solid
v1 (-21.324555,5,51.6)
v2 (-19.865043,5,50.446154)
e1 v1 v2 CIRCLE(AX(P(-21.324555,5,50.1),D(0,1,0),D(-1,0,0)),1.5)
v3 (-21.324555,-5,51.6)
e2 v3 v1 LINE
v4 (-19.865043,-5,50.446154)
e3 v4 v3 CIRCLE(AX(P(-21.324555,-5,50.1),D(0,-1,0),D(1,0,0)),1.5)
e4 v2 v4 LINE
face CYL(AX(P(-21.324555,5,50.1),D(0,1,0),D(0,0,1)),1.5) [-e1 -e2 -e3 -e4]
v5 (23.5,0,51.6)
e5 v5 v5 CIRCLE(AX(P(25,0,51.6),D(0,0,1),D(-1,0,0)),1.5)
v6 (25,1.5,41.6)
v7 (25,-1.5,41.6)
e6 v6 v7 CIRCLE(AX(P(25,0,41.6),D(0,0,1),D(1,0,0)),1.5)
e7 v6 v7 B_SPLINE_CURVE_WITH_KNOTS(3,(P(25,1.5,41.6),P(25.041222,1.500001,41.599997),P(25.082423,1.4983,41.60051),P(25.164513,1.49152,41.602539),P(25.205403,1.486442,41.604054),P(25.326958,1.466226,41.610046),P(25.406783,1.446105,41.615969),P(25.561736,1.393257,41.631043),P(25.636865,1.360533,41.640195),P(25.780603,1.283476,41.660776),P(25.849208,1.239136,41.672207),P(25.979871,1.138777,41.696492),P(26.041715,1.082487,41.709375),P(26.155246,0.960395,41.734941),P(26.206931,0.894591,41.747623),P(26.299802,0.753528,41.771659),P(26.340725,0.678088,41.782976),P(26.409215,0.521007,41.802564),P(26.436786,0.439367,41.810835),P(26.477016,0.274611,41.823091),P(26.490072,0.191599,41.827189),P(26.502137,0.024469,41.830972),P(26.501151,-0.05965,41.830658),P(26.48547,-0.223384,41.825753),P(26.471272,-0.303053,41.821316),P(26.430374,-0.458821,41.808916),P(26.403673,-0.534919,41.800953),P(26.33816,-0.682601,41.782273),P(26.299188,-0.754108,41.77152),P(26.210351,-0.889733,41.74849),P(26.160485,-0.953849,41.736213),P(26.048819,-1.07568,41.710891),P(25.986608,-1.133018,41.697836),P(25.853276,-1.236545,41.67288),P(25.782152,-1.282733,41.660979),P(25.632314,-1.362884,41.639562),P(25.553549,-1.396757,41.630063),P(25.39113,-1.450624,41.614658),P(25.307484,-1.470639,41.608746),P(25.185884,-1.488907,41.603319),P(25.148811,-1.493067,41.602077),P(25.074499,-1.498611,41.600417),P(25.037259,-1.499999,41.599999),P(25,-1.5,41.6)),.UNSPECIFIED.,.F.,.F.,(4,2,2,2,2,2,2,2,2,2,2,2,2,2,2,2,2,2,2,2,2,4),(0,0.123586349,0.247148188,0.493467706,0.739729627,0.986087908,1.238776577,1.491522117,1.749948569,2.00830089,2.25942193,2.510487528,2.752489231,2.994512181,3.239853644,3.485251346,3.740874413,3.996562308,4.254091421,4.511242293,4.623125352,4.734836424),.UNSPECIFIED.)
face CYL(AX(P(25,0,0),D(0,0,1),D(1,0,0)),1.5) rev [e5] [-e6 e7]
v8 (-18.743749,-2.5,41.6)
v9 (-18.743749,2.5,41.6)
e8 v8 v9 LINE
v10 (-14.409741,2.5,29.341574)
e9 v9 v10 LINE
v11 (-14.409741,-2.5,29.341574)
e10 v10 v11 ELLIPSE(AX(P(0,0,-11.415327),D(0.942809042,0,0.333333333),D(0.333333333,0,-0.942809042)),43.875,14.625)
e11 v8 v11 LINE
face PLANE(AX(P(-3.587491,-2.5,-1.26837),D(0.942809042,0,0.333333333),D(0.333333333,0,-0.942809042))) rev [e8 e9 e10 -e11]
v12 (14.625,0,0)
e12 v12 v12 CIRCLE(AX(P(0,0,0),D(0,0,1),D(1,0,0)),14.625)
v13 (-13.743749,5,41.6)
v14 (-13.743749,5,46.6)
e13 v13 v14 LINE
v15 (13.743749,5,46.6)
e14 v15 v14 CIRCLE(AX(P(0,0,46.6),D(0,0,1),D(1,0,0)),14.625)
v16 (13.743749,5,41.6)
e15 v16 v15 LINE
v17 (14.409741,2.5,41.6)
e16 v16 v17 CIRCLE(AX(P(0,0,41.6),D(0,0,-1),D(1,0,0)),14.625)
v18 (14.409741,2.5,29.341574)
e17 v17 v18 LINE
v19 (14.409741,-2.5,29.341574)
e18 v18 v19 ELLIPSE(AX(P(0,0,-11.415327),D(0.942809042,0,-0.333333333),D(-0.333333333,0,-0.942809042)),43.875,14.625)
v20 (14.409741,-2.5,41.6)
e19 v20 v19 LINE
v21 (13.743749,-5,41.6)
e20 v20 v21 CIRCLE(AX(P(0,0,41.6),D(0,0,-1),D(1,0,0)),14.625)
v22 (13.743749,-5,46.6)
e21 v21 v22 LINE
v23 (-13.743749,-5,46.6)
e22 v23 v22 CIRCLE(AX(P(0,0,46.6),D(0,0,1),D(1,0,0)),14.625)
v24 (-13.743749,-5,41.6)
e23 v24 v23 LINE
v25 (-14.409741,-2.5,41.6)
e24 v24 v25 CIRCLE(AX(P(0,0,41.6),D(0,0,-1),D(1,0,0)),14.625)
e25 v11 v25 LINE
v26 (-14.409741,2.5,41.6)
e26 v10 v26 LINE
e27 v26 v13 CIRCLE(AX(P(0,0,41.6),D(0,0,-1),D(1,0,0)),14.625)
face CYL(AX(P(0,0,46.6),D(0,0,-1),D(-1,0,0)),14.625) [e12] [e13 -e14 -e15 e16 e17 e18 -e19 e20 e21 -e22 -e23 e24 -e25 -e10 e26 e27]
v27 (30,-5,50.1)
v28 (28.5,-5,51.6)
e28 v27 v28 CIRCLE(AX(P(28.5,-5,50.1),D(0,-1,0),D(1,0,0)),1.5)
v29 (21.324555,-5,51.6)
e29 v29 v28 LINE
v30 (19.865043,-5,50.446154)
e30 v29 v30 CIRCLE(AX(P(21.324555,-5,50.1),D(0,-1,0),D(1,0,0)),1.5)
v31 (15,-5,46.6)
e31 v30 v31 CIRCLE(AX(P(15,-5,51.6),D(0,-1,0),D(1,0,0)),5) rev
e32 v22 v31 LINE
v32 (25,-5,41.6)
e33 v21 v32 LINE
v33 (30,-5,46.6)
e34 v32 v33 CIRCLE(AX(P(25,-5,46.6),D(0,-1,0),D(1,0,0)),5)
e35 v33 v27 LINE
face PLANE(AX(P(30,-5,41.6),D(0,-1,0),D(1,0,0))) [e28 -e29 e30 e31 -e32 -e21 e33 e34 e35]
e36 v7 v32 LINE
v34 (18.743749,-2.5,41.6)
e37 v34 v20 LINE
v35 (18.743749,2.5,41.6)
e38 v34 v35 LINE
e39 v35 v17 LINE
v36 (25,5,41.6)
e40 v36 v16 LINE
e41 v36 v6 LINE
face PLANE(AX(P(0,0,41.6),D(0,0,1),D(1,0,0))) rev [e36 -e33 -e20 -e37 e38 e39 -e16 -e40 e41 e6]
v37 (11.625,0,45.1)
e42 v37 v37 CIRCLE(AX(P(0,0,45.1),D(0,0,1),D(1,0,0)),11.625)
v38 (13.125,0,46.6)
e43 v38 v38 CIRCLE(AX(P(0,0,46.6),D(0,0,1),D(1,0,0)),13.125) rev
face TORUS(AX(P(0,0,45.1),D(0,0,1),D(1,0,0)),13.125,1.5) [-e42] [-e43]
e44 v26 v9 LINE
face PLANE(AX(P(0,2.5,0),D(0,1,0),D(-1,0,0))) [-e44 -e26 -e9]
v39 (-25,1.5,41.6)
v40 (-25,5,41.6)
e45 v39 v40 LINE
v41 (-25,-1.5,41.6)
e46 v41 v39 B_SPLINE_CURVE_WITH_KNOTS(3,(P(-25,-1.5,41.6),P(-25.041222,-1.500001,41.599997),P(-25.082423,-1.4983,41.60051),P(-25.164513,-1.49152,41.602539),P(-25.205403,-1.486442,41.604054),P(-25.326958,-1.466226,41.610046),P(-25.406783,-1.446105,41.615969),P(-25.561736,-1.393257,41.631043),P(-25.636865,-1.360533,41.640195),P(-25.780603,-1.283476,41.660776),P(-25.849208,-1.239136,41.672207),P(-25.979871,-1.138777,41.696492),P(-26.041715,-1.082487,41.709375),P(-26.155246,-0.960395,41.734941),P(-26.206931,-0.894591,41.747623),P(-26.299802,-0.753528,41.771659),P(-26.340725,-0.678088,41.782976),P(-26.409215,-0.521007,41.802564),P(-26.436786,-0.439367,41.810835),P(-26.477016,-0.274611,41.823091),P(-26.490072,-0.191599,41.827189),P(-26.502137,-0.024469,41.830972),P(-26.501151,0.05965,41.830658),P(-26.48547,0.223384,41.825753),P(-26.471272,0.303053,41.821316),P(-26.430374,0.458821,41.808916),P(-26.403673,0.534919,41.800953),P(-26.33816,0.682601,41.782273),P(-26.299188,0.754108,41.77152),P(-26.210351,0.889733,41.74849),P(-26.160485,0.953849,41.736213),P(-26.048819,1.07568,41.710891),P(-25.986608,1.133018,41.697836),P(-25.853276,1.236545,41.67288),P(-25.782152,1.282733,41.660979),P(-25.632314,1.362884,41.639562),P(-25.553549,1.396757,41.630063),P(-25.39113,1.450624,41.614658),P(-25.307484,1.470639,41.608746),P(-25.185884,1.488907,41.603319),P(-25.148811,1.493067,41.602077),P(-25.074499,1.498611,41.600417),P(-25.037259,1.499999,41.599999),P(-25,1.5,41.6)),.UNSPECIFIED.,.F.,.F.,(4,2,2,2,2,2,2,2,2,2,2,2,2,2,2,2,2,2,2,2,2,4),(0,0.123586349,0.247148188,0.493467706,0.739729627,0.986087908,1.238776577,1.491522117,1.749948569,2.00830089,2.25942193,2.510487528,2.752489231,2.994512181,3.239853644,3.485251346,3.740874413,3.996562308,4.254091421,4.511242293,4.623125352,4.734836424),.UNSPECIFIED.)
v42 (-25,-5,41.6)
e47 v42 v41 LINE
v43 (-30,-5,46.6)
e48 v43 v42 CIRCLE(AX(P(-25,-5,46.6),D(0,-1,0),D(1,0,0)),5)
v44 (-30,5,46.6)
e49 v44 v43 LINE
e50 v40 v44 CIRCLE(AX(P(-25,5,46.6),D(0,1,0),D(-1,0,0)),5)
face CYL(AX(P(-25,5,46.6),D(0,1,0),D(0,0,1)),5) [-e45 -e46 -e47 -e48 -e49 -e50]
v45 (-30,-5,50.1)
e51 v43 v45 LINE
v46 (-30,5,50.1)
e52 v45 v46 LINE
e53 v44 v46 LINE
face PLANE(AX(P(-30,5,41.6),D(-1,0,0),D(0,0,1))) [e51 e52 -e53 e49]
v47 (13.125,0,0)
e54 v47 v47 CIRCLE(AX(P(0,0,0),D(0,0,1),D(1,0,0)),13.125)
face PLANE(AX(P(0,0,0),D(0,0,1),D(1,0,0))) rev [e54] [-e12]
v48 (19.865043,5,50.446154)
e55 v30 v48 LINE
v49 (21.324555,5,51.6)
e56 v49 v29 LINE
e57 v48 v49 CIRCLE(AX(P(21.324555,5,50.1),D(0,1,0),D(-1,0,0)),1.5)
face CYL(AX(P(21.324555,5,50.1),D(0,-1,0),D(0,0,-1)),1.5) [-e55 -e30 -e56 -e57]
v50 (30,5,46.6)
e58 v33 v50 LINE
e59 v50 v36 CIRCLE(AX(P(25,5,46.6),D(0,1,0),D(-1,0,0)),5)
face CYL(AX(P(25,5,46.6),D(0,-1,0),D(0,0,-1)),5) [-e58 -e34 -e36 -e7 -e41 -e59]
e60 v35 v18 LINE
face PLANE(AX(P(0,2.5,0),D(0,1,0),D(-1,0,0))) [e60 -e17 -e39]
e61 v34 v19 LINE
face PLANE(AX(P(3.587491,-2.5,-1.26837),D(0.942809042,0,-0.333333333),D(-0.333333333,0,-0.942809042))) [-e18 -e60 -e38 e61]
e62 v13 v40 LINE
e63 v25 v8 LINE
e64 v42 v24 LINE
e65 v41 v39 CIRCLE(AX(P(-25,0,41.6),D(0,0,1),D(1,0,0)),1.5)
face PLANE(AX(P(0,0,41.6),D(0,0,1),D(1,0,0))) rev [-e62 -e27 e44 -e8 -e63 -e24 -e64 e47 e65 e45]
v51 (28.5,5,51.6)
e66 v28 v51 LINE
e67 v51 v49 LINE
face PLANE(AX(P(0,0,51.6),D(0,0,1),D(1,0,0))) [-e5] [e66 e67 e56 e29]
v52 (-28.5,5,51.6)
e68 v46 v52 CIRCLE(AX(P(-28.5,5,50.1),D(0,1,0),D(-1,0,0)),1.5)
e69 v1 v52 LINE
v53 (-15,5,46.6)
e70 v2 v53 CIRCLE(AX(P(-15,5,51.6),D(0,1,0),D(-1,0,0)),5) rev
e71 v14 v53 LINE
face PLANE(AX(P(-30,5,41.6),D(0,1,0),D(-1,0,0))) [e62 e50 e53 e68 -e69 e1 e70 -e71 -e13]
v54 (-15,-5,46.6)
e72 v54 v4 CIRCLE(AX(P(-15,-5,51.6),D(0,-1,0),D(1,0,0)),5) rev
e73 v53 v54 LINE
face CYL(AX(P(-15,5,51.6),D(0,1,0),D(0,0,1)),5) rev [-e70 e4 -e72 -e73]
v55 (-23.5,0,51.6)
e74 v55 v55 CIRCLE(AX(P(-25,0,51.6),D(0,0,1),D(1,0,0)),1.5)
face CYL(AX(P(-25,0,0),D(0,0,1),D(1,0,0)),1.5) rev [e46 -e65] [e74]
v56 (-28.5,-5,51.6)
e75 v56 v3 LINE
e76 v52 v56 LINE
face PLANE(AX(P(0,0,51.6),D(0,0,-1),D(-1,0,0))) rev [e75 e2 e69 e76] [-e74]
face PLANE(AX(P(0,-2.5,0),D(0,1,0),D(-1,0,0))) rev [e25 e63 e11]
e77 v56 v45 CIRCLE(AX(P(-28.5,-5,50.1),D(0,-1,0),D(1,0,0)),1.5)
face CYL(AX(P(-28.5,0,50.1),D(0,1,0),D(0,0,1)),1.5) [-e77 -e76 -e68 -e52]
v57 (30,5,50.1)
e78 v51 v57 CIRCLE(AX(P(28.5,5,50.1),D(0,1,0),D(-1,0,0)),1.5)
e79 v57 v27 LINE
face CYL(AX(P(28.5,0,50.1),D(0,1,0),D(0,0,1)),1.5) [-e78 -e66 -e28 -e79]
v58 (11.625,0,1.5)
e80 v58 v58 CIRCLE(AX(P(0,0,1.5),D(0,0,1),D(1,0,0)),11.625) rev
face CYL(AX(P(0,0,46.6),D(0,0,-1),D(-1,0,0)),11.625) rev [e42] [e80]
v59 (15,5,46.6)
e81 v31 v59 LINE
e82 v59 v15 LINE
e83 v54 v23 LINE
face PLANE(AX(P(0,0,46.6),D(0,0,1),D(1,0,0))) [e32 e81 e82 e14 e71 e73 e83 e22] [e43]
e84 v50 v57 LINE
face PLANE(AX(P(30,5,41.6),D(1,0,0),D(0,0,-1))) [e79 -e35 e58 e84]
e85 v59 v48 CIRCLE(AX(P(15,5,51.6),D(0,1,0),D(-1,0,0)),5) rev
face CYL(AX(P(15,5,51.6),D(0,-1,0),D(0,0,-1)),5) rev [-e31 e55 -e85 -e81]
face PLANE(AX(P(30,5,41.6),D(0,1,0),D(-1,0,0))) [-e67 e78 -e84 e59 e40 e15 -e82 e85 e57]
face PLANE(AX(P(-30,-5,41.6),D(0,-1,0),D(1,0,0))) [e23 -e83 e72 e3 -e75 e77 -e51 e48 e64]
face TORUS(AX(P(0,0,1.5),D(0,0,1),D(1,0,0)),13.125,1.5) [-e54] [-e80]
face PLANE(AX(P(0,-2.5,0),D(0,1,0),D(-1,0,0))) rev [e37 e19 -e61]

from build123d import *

# Parameters (mm, degrees)
ESQUISSE1_R             = 14.625
ESQUISSE1_R_2           = 11.625
BOSS_EXTRU_1_DEPTH      = 46.6
BOSS_EXTRU_3_START      = -5
BOSS_EXTRU_3_DEPTH      = 5
ESQUISSE3_W             = 10
ESQUISSE3_H             = 10
BOSS_EXTRU_4_DEPTH      = 5
CONG_1_R                = 5
BOSS_EXTRU_6_START      = -2.5
BOSS_EXTRU_6_DEPTH      = 5
CONG_2_R                = 5
ESQUISSE5_R             = 1.5
ENL_V_MAT_EXTRU_1_DEPTH = 62.452832522
CONG_3_R                = 1.5
CONG_4_R                = 1.5


with BuildPart() as part:
    # Esquisse1 → Boss.-Extru.1 (new body)
    with BuildSketch(Plane.XY):
        Circle(ESQUISSE1_R)
        Circle(ESQUISSE1_R_2, mode=Mode.SUBTRACT)
    extrude(amount=BOSS_EXTRU_1_DEPTH)

    # Esquisse2 → Boss.-Extru.3 (add)
    with BuildSketch(Plane.XY.offset(46.6).offset(BOSS_EXTRU_3_START)):
        with BuildLine():
            Line((-30, 5), (-13.743748579, 5))
            ThreePointArc((-13.743748579, 5), (-14.625, 0), (-13.743748579, -5))
            Line((-13.743748579, -5), (-30, -5))
            Line((-30, -5), (-30, 5))
        make_face()
        with BuildLine():
            Line((30, 5), (30, -5))
            Line((30, -5), (13.743748579, -5))
            ThreePointArc((13.743748579, -5), (14.625, 0), (13.743748579, 5))
            Line((13.743748579, 5), (30, 5))
        make_face()
    extrude(amount=BOSS_EXTRU_3_DEPTH)

    # Esquisse3 → Boss.-Extru.4 (add)
    with BuildSketch(Plane.XY.offset(46.6)):
        with Locations((-25, 0)):
            Rectangle(ESQUISSE3_W, ESQUISSE3_H)
        with Locations((25, 0)):
            Rectangle(ESQUISSE3_W, ESQUISSE3_H)
    extrude(amount=BOSS_EXTRU_4_DEPTH)

    # Congé1
    cong_1_edges = [part.edges().sort_by_distance(p)[0] for p in [
        (30, 0, 41.6),
        (-30, 0, 41.6),
    ]]
    fillet(cong_1_edges, radius=CONG_1_R)

    # Esquisse4 → Boss.-Extru.6 (add)
    with BuildSketch(Plane(origin=(0, 5, 0), x_dir=(1, 0, 0), z_dir=(0, 1, 0)).offset(BOSS_EXTRU_6_START)):
        Polygon((-18.743748579, -41.6), (-13.743748579, -41.6), (-13.743748579, -27.457864376), align=None)
        Polygon((13.743748579, -27.457864376), (13.743748579, -41.6), (18.743748579, -41.6), align=None)
    extrude(amount=-BOSS_EXTRU_6_DEPTH)

    # Congé2
    cong_2_edges = [part.edges().sort_by_distance(p)[0] for p in [
        (20, 0, 46.6),
        (-20, 0, 46.6),
    ]]
    fillet(cong_2_edges, radius=CONG_2_R - 0.0001)  # a hair under: the kernel refuses the full size

    # Esquisse5 → Enlèv. mat.-Extru.1 (cut, through all)
    with BuildSketch(Plane.XY.offset(51.6)):
        with Locations((-25, 0)):
            Circle(ESQUISSE5_R)
        with Locations(Location((25, 0, 0), (0, 0, 270))):
            Circle(ESQUISSE5_R)
    extrude(amount=-ENL_V_MAT_EXTRU_1_DEPTH, mode=Mode.SUBTRACT)

    # Congé3
    cong_3_edges = [part.edges().sort_by_distance(p)[0] for p in [
        (-30, 0, 51.6),
        (-20, 0, 51.6),
        (20, 0, 51.6),
        (30, 0, 51.6),
    ]]
    fillet(cong_3_edges, radius=CONG_3_R)

    # Congé4
    cong_4_edges = [part.edges().sort_by_distance(p)[0] for p in [
        (-11.625, 0, 0),
        (-11.625, 0, 46.6),
    ]]
    fillet(cong_4_edges, radius=CONG_4_R)


solid = part.part
